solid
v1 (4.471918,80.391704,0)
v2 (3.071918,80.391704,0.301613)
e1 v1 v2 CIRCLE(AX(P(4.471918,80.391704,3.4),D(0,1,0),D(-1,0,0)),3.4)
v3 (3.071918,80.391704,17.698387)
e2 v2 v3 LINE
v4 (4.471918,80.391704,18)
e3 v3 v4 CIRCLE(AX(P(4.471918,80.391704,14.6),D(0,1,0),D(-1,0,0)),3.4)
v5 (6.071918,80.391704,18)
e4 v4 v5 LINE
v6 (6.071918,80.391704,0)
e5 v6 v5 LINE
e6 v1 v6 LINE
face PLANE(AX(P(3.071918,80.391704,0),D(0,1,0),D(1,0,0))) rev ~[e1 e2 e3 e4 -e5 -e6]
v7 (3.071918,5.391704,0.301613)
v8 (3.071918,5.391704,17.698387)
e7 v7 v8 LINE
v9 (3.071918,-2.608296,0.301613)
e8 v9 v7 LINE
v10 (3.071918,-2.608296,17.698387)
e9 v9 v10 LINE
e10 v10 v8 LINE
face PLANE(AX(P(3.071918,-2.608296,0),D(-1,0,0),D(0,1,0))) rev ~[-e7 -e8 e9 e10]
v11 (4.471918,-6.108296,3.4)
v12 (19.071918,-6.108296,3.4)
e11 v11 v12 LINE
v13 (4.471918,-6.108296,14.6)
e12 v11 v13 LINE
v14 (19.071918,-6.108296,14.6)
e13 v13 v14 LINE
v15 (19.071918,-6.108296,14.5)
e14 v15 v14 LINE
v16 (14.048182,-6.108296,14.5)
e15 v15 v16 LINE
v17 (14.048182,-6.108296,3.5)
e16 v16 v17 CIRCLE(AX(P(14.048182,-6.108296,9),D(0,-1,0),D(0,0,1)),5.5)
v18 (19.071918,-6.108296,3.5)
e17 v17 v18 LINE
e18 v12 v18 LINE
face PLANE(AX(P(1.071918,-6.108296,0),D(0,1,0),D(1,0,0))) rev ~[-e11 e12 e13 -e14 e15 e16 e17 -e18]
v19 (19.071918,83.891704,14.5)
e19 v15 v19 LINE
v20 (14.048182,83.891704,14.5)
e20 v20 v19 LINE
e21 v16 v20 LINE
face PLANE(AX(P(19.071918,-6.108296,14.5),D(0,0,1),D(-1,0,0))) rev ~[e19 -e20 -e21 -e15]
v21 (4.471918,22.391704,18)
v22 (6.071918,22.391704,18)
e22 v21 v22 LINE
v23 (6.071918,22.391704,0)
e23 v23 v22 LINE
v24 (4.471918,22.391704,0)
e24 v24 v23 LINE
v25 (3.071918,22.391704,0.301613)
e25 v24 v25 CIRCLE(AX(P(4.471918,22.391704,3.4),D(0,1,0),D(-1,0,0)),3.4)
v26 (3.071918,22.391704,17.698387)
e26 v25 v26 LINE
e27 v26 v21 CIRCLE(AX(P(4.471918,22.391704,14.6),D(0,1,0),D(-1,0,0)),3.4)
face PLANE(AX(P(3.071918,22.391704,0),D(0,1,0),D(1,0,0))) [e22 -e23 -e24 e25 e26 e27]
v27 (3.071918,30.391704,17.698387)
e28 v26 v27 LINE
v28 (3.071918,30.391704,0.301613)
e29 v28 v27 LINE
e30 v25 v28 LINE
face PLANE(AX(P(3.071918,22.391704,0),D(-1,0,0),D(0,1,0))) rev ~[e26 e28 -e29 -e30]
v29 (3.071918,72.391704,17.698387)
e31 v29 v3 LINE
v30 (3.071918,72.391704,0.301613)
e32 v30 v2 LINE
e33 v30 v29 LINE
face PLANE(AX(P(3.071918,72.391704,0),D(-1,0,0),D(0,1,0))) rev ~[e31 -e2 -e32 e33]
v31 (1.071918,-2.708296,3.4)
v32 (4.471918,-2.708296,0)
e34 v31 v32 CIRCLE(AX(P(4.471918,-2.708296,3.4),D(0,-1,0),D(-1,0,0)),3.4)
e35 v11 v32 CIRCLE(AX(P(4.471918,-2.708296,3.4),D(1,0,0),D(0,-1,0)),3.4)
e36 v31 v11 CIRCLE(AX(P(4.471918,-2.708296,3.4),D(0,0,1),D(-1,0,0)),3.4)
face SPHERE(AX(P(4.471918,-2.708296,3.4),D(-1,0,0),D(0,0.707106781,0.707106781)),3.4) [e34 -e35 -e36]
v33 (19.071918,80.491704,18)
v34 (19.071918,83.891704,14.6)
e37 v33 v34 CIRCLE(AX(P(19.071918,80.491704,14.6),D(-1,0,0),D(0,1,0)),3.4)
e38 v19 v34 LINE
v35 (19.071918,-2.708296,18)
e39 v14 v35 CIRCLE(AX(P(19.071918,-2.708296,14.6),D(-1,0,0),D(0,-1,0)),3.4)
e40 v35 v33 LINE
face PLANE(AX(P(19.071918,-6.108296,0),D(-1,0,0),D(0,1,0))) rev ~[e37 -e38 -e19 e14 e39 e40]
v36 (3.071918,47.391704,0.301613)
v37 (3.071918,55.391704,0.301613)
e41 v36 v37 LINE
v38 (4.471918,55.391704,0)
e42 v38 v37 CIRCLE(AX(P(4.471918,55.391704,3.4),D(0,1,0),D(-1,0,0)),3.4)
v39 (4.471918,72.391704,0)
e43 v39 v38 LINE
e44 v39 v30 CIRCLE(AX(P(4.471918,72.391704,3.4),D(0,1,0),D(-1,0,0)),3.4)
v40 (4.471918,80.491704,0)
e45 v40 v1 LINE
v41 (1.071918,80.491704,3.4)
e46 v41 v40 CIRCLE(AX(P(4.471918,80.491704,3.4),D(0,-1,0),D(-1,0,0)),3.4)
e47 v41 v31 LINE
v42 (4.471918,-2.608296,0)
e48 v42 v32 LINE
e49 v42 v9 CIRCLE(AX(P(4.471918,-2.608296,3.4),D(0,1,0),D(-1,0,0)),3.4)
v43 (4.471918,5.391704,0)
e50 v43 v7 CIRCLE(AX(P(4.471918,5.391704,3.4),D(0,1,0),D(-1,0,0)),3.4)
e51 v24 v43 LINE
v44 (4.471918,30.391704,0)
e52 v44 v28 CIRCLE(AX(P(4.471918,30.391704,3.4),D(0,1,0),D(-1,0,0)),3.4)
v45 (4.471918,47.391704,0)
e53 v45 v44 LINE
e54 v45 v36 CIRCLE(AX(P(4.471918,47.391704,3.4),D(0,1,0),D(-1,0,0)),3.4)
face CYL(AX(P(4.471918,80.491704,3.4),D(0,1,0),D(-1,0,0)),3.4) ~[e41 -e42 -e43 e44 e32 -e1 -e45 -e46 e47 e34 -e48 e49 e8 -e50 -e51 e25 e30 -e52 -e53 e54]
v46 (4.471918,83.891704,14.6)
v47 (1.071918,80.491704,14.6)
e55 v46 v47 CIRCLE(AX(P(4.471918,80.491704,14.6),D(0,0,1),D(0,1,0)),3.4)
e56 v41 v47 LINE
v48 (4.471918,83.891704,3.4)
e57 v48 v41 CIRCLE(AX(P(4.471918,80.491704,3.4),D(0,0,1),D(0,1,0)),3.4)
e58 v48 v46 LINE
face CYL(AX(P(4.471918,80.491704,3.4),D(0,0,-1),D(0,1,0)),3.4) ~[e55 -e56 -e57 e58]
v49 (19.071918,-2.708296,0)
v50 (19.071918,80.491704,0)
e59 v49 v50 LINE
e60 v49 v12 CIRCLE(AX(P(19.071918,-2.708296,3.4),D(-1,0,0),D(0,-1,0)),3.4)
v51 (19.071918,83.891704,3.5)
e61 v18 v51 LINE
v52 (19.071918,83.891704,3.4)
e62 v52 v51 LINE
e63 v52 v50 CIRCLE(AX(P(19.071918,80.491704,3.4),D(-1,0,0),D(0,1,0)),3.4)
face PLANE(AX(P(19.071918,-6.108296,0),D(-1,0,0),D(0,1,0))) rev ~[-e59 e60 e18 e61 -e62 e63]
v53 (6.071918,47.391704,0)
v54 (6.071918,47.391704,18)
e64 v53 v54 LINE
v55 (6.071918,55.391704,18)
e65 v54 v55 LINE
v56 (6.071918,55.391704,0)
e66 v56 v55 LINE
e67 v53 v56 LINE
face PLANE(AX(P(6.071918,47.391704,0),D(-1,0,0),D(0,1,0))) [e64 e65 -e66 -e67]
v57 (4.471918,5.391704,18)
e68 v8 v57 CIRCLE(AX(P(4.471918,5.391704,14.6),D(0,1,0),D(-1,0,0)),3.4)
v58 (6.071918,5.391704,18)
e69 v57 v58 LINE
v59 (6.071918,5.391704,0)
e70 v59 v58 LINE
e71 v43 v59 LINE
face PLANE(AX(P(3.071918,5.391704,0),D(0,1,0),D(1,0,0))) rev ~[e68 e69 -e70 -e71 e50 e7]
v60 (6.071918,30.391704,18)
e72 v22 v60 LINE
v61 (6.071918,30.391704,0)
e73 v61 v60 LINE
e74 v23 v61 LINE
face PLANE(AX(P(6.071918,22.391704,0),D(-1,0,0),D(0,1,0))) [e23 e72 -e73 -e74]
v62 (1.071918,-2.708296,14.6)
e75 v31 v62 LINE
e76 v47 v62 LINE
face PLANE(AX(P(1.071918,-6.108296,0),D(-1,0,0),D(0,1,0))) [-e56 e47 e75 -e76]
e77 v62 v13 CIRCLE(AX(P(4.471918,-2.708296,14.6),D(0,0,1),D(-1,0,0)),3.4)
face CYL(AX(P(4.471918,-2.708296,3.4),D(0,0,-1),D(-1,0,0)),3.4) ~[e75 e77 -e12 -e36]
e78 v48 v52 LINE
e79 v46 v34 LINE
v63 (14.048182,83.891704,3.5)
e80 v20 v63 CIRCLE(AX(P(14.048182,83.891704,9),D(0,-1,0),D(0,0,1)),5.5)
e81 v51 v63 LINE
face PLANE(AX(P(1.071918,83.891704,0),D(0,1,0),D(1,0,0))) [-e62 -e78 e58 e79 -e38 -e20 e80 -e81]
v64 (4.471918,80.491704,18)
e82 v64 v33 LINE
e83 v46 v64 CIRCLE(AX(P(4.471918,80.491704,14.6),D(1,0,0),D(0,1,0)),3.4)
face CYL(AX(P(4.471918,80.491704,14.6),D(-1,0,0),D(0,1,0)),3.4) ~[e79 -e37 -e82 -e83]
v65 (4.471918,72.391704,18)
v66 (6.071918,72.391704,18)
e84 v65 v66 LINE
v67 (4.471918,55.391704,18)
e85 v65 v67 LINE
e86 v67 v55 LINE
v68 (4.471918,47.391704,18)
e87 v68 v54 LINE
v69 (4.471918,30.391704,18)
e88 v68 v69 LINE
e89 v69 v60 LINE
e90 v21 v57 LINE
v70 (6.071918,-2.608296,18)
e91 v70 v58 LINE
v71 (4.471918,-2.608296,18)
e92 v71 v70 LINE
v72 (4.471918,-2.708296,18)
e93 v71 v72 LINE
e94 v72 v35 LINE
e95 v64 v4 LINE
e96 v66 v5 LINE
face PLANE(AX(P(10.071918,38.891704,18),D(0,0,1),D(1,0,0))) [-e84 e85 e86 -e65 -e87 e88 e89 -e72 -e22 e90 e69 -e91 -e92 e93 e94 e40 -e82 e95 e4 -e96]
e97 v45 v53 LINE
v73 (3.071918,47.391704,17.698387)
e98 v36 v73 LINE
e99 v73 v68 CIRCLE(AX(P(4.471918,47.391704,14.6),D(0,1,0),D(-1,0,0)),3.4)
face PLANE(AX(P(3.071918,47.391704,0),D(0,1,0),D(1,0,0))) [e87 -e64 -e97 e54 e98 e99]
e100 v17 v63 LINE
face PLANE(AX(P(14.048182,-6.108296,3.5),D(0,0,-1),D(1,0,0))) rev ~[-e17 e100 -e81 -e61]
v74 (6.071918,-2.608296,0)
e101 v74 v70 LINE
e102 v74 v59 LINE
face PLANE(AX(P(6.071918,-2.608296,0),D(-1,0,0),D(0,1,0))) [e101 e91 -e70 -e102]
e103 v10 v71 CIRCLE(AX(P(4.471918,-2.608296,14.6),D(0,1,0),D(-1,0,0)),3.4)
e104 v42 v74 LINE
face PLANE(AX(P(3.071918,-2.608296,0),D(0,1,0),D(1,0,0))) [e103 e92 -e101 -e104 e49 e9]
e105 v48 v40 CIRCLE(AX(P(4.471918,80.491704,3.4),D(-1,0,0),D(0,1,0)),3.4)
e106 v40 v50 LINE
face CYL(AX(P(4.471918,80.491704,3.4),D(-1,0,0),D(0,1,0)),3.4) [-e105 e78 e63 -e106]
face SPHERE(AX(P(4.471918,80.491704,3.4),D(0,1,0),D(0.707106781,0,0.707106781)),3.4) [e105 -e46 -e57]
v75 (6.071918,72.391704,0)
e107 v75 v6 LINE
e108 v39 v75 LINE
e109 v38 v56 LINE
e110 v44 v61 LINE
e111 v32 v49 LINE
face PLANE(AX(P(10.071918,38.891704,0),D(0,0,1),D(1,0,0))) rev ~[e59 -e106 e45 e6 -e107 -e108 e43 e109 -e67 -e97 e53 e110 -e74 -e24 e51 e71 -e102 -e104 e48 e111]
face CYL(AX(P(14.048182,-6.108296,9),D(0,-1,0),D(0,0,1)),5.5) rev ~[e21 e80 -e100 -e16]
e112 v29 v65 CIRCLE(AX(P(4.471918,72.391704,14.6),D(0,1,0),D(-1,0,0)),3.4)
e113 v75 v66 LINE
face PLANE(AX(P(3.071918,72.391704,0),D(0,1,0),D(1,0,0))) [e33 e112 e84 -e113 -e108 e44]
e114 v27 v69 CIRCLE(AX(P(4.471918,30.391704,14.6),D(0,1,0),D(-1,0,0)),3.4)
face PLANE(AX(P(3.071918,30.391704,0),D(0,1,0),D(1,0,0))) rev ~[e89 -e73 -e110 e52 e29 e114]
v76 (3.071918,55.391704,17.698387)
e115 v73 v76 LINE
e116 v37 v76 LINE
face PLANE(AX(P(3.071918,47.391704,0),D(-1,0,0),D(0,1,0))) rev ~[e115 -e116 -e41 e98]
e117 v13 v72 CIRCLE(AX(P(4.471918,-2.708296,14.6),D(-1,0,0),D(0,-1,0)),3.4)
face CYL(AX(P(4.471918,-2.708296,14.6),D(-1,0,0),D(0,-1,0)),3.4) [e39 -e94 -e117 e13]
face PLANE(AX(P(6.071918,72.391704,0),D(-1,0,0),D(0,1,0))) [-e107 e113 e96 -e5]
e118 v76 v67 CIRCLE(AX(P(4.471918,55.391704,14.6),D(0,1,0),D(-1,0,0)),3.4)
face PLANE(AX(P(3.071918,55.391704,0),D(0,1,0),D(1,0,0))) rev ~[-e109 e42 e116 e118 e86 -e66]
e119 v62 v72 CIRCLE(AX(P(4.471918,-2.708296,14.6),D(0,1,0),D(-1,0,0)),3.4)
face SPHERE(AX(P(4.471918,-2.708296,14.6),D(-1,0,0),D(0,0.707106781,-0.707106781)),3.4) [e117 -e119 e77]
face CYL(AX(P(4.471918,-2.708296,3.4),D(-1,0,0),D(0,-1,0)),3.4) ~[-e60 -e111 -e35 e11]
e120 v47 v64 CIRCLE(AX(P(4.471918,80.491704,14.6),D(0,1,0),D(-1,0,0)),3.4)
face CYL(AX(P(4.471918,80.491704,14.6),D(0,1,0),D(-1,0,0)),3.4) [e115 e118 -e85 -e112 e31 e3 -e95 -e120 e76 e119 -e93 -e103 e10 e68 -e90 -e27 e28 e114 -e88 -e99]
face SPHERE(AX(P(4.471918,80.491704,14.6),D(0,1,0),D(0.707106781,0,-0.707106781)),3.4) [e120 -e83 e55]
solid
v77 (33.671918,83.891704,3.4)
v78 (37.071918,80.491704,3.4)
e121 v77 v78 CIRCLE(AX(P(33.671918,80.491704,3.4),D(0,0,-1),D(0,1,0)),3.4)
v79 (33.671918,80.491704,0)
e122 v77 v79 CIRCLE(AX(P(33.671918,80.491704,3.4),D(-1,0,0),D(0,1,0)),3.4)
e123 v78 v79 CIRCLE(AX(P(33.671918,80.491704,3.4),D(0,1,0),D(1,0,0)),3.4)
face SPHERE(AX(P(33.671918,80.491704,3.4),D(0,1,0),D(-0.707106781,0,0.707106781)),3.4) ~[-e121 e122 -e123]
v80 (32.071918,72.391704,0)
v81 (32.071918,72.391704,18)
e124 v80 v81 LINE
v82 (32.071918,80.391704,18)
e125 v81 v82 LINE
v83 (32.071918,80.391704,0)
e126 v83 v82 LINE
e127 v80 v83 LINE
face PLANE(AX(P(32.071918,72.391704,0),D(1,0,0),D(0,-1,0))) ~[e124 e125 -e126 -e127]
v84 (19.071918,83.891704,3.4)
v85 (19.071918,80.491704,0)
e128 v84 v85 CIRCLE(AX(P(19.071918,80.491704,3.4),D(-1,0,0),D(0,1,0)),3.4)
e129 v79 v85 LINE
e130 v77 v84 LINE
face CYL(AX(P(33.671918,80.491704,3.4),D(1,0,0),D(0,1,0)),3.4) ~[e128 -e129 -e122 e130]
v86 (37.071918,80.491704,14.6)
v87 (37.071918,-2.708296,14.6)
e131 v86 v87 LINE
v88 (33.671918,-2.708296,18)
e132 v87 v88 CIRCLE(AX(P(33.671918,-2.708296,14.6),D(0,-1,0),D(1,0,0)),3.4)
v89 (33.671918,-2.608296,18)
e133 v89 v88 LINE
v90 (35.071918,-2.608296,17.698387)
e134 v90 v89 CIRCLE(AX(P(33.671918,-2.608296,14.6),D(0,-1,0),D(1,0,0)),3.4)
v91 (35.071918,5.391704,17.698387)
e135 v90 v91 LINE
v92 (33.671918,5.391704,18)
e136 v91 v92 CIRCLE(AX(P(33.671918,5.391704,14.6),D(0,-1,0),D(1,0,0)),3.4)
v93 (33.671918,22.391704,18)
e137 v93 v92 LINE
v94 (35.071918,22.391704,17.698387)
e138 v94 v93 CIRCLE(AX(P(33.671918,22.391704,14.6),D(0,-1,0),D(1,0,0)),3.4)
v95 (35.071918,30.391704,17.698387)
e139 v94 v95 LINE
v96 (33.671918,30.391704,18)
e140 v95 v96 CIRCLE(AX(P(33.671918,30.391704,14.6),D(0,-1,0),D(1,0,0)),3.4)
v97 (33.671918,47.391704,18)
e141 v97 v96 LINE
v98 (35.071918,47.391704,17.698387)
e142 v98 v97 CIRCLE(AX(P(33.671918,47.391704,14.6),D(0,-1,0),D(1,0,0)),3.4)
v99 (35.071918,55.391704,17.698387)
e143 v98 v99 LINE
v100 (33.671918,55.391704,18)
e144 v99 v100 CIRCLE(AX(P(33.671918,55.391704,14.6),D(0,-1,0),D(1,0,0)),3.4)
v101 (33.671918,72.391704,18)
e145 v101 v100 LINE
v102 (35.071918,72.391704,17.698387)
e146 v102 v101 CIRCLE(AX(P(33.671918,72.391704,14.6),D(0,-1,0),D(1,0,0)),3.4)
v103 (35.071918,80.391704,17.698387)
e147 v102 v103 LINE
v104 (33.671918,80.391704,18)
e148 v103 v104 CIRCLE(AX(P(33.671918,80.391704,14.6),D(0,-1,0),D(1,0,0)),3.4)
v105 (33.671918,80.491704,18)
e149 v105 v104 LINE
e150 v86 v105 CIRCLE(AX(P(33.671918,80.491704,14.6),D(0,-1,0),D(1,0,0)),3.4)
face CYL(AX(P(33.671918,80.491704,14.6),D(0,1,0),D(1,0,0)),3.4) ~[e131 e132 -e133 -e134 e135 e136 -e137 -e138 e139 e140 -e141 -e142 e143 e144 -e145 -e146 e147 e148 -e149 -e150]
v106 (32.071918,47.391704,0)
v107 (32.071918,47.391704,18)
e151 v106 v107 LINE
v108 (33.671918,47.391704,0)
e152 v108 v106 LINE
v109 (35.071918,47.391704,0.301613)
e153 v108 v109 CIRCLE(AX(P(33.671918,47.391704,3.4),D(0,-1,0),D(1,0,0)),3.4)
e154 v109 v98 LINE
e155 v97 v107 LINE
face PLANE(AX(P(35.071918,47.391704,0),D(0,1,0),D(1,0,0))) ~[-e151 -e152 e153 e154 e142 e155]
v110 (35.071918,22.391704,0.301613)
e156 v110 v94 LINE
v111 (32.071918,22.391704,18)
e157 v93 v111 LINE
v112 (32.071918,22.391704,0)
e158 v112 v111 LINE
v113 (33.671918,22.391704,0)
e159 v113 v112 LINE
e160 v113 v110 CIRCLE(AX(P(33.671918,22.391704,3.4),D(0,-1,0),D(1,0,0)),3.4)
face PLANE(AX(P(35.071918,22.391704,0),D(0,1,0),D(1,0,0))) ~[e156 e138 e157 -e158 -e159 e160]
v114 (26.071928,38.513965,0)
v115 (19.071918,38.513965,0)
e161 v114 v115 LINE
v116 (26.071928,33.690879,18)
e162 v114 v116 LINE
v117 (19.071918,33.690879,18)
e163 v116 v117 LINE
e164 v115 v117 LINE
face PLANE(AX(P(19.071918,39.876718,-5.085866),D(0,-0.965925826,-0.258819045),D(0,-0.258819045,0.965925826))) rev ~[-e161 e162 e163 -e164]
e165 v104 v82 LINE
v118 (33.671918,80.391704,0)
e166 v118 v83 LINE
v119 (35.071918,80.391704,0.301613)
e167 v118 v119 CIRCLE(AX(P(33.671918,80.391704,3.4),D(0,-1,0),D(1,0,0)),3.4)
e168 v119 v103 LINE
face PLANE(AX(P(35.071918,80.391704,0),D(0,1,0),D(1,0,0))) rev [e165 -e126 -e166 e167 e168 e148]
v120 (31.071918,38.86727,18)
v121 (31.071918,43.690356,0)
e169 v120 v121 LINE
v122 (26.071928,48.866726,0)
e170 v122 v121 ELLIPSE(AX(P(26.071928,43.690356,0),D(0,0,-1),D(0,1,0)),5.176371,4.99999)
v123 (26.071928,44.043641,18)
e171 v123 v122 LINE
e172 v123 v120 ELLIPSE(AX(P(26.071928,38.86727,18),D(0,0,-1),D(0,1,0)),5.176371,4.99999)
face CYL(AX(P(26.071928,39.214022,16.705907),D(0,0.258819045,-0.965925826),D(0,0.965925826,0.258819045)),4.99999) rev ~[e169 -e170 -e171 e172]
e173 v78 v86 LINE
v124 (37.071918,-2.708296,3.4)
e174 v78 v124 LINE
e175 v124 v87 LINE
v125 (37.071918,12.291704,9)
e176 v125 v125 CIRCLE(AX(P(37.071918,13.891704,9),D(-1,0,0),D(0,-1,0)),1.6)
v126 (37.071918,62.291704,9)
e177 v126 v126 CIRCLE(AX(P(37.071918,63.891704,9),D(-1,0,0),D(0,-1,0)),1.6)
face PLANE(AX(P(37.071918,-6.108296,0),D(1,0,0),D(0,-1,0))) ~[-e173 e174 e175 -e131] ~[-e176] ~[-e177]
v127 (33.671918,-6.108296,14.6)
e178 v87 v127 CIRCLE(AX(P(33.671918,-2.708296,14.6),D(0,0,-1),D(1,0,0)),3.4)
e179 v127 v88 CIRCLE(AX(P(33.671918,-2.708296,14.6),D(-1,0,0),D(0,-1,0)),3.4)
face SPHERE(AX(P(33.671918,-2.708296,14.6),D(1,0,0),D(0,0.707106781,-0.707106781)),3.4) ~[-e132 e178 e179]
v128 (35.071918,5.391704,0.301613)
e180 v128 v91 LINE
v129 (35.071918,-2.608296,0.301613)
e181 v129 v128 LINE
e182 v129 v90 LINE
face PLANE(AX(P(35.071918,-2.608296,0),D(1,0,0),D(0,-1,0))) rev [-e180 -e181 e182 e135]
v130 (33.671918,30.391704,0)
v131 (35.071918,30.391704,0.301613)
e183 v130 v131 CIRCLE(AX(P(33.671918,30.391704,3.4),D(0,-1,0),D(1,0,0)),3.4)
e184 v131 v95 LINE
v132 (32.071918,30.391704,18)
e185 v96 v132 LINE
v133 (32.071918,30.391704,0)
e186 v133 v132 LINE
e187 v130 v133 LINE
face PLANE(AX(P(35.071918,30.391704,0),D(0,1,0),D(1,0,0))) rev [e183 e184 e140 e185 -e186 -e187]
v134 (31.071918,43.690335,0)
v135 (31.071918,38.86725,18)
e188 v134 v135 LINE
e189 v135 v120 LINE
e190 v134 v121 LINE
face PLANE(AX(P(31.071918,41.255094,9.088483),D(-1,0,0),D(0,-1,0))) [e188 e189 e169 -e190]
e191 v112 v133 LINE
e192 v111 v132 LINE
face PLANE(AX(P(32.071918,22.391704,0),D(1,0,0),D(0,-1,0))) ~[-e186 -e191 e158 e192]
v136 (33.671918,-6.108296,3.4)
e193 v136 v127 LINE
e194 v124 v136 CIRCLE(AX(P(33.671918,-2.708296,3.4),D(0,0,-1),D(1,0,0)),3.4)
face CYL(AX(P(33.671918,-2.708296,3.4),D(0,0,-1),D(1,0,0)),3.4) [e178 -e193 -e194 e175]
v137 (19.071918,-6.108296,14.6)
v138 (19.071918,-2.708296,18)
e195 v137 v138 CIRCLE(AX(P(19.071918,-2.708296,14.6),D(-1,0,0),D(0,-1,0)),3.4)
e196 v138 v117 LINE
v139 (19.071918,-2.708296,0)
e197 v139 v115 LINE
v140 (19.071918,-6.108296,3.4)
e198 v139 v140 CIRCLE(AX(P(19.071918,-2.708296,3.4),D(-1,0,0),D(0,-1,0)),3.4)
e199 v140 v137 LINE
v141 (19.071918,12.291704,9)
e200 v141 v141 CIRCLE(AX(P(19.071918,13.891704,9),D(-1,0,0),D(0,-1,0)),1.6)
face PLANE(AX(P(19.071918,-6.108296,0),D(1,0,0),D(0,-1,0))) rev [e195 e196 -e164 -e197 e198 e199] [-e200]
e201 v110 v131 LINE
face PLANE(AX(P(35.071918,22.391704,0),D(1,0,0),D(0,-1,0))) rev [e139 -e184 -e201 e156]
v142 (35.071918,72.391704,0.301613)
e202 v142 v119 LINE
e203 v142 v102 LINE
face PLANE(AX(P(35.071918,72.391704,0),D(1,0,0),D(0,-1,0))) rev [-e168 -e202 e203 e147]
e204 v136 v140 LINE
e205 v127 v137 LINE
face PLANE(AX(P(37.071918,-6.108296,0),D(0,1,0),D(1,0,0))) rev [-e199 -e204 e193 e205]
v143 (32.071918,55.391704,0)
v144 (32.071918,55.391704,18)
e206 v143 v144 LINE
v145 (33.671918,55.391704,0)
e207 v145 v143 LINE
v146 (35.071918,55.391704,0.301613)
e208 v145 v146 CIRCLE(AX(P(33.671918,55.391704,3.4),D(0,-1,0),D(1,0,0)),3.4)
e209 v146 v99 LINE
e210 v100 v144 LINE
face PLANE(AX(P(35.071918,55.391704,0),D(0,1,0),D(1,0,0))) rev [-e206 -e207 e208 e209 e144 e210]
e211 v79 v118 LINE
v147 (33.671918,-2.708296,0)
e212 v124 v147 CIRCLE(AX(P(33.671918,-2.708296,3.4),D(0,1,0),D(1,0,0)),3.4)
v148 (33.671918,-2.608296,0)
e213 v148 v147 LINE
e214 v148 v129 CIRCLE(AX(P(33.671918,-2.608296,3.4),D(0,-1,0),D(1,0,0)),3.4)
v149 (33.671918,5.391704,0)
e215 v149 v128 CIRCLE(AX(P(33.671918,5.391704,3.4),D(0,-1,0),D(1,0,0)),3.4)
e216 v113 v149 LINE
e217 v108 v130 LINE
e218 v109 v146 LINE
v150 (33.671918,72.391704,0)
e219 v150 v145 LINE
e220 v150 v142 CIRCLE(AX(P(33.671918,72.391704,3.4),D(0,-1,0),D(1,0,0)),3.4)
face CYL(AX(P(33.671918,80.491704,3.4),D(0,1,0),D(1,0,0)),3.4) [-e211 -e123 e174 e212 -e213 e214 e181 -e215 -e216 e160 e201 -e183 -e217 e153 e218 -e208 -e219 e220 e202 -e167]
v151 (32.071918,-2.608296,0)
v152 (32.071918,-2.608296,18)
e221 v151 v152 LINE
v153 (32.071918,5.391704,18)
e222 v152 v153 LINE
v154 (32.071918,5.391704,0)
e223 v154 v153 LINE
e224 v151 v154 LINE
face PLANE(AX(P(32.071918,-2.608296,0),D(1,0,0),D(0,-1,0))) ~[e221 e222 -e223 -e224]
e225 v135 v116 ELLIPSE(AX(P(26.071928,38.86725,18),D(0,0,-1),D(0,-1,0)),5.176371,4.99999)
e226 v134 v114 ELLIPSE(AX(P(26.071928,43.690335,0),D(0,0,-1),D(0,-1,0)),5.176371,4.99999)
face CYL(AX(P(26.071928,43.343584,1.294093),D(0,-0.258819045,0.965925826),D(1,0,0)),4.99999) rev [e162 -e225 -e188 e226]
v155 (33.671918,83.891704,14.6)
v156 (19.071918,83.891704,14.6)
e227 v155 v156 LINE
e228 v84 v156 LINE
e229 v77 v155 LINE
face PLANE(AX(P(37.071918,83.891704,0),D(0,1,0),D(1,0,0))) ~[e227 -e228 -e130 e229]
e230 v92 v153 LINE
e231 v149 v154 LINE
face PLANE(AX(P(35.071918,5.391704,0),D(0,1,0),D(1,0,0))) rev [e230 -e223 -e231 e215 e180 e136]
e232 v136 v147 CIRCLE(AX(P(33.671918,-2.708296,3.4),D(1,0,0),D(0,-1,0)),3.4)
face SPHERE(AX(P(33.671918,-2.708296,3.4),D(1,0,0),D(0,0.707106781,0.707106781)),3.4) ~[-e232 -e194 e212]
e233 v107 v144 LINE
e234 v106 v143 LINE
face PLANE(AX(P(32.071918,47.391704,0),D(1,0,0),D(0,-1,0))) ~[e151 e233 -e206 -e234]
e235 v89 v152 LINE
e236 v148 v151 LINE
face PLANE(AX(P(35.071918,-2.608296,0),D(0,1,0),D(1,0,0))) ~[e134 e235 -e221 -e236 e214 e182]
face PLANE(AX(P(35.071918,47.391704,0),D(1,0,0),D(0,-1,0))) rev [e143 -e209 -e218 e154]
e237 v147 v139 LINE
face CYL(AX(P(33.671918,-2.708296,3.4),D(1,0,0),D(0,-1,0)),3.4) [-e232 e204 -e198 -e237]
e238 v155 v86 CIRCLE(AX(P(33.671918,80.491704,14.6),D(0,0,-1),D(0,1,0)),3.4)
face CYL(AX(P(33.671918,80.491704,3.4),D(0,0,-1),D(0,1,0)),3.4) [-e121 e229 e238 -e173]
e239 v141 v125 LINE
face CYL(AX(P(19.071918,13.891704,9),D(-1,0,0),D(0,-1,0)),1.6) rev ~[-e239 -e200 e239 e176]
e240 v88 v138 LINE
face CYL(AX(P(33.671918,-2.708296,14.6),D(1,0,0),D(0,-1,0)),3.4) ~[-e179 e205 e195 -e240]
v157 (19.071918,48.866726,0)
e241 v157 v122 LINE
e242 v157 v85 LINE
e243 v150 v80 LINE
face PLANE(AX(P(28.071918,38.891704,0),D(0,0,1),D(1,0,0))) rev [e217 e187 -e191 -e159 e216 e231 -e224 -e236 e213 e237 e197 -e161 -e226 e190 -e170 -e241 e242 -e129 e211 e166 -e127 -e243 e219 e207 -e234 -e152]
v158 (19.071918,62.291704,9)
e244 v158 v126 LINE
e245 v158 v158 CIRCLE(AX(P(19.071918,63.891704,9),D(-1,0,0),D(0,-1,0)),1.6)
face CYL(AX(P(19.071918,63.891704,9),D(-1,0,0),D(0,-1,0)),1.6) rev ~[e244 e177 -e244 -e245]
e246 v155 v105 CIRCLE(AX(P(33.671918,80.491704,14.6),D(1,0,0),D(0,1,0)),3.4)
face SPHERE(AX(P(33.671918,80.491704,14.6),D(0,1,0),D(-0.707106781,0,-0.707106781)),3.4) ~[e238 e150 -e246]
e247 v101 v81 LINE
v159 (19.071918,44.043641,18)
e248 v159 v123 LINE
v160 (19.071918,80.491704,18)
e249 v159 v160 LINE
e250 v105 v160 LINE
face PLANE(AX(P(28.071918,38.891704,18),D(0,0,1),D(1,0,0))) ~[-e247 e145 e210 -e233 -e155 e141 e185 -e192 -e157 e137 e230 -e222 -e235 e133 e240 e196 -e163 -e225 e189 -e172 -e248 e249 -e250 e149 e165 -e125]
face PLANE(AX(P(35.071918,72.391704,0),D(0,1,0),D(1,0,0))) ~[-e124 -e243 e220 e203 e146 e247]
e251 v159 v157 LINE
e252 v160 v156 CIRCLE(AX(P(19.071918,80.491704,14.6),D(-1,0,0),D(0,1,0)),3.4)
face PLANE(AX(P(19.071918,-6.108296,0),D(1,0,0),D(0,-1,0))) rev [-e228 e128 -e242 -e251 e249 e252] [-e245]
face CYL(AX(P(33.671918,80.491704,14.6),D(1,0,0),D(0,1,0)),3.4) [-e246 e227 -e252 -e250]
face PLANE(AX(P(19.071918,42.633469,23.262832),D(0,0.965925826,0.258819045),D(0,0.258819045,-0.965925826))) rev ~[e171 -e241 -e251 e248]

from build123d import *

# Parameters (mm, degrees)
F0_W         = 18
F0_H         = 90
F0_W_2       = 3
F0_H_2       = 8
F1_DEPTH     = 18
F3_T1_DEPTH  = 23.1
F3_T3_DEPTH  = 83.2
F3_T5_DEPTH  = 11.2
F3_S9_W      = 3.4
F3_S9_H      = 3.4
F3_T10_DEPTH = 3.4
F3_S15_W     = 3.4
F3_S15_H     = 3.4
F3_T16_DEPTH = 3.4
F3_S21_W     = 3.4
F3_S21_H     = 3.4
F3_T22_DEPTH = 3.4
F3_S27_W     = 3.4
F3_S27_H     = 3.4
F3_T28_DEPTH = 3.4
F5_DEPTH     = 90.001
F7_DEPTH     = 12
F8_R         = 4.99999
F9_R         = 1.6
F10_DEPTH    = 18.001


# Not quite as in the source:
# - a fillet or chamfer that OpenCascade refuses, or shapes differently, is made with other operations: its cross-section is extruded or revolved along the edge and cut away or added
# - a fillet or chamfer is up to 0.001 mm smaller than in the source, because OpenCascade refuses the exact size


with BuildPart() as f1:
    # F0 (on Top) → F1 (new body)
    with BuildSketch(Plane.XY):
        with Locations((10.0719179884, 38.8917037249)):
            Rectangle(F0_W, F0_H)
        with Locations((4.5719179884, 1.3917037249)):
            Rectangle(F0_W_2, F0_H_2, mode=Mode.SUBTRACT)
        with Locations((4.5719179884, 26.3917037249)):
            Rectangle(F0_W_2, F0_H_2, mode=Mode.SUBTRACT)
        with Locations((4.5719179884, 51.3917037249)):
            Rectangle(F0_W_2, F0_H_2, mode=Mode.SUBTRACT)
        with Locations((4.5719179884, 76.3917037249)):
            Rectangle(F0_W_2, F0_H_2, mode=Mode.SUBTRACT)
    extrude(amount=F1_DEPTH)

    # F3: fillet of radius 3.4 on 8 edges, made by hand

    # F3_s2 → F3_t1 (cut)
    with BuildSketch(Plane.YZ.offset(4.4719179884)):
        with BuildLine():
            ThreePointArc((-6.1082962751, 14.6), (-5.1124593312, 17.004163056), (-2.7082962751, 18))
            Line((-2.7082962751, 18), (-6.1082962751, 18))
            Line((-6.1082962751, 18), (-6.1082962751, 14.6))
        make_face()
        with BuildLine():
            ThreePointArc((-6.1082962751, 3.4), (-5.1124593312, 0.995836944), (-2.7082962751, 0))
            Line((-2.7082962751, 0), (-6.1082962751, 0))
            Line((-6.1082962751, 0), (-6.1082962751, 3.4))
        make_face()
        with BuildLine():
            ThreePointArc((83.8917037249, 14.6), (82.8958667809, 17.004163056), (80.4917037249, 18))
            Line((80.4917037249, 18), (83.8917037249, 18))
            Line((83.8917037249, 18), (83.8917037249, 14.6))
        make_face()
        with BuildLine():
            ThreePointArc((83.8917037249, 3.4), (82.8958667809, 0.995836944), (80.4917037249, 0))
            Line((80.4917037249, 0), (83.8917037249, 0))
            Line((83.8917037249, 0), (83.8917037249, 3.4))
        make_face()
    extrude(amount=F3_T1_DEPTH, mode=Mode.SUBTRACT)

    # F3_s4 → F3_t3 (cut)
    with BuildSketch(Plane.XZ.offset(-80.4917037249)):
        with BuildLine():
            ThreePointArc((1.0719179884, 14.6), (2.0677549323, 17.004163056), (4.4719179884, 18))
            Line((4.4719179884, 18), (1.0719179884, 18))
            Line((1.0719179884, 18), (1.0719179884, 14.6))
        make_face()
        with BuildLine():
            ThreePointArc((1.0719179884, 3.4), (2.0677549323, 0.995836944), (4.4719179884, 0))
            Line((4.4719179884, 0), (1.0719179884, 0))
            Line((1.0719179884, 0), (1.0719179884, 3.4))
        make_face()
    extrude(amount=F3_T3_DEPTH, mode=Mode.SUBTRACT)

    # F3_s6 → F3_t5 (cut)
    with BuildSketch(Plane.XY.offset(3.4)):
        with BuildLine():
            ThreePointArc((1.0719179884, -2.7082962751), (2.0677549323, -5.1124593312), (4.4719179884, -6.1082962751))
            Line((4.4719179884, -6.1082962751), (1.0719179884, -6.1082962751))
            Line((1.0719179884, -6.1082962751), (1.0719179884, -2.7082962751))
        make_face()
        with BuildLine():
            ThreePointArc((4.4719179884, 83.8917037249), (2.0677549323, 82.8958667809), (1.0719179884, 80.4917037249))
            Line((1.0719179884, 80.4917037249), (1.0719179884, 83.8917037249))
            Line((1.0719179884, 83.8917037249), (4.4719179884, 83.8917037249))
        make_face()
    extrude(amount=F3_T5_DEPTH, mode=Mode.SUBTRACT)


with BuildPart() as f3_tool8:
    # F3_s9 → F3_t10 (new body)
    with BuildSketch(Plane.YZ.offset(4.4719179884)):
        with Locations((-4.4082962751, 16.3)):
            Rectangle(F3_S9_W, F3_S9_H)
    extrude(amount=-F3_T10_DEPTH)

    # F3_s11 → F3_t12 (revolve, cut)
    with BuildSketch(Plane(origin=(4.4719179884, -2.7082962751, 14.6), x_dir=(0, 0.7071067812, -0.7071067812), z_dir=(0, 0.7071067812, 0.7071067812))):
        with BuildLine():
            ThreePointArc((0, -3.4), (3.4, 0), (0, 3.4))
            Line((0, 3.4), (0, -3.4))
        make_face()
    revolve(axis=Axis((4.4719179884, -2.7082962751, 14.6), (-1, 0, 0)), mode=Mode.SUBTRACT)


with BuildPart() as f1_1:
    add(f1.part)

    # F3_t7: cut F3_tool8
    add(f3_tool8.part, mode=Mode.SUBTRACT)


with BuildPart() as f3_tool14:
    # F3_s15 → F3_t16 (new body)
    with BuildSketch(Plane.XZ.offset(-80.4917037249)):
        with Locations((2.7719179884, 16.3)):
            Rectangle(F3_S15_W, F3_S15_H)
    extrude(amount=-F3_T16_DEPTH)

    # F3_s17 → F3_t18 (revolve, cut)
    with BuildSketch(Plane(origin=(4.4719179884, 80.4917037249, 14.6), x_dir=(0.7071067812, 0, -0.7071067812), z_dir=(0.7071067812, 0, 0.7071067812))):
        with BuildLine():
            ThreePointArc((0, -3.4), (3.4, 0), (0, 3.4))
            Line((0, 3.4), (0, -3.4))
        make_face()
    revolve(axis=Axis((4.4719179884, 80.4917037249, 14.6), (0, 1, 0)), mode=Mode.SUBTRACT)


with BuildPart() as f1_2:
    add(f1_1.part)

    # F3_t13: cut F3_tool14
    add(f3_tool14.part, mode=Mode.SUBTRACT)


with BuildPart() as f3_tool20:
    # F3_s21 → F3_t22 (new body)
    with BuildSketch(Plane.YZ.offset(4.4719179884)):
        with Locations((-4.4082962751, 1.7)):
            Rectangle(F3_S21_W, F3_S21_H)
    extrude(amount=-F3_T22_DEPTH)

    # F3_s23 → F3_t24 (revolve, cut)
    with BuildSketch(Plane(origin=(4.4719179884, -2.7082962751, 3.4), x_dir=(0, 0.7071067812, 0.7071067812), z_dir=(0, -0.7071067812, 0.7071067812))):
        with BuildLine():
            ThreePointArc((0, -3.4), (3.4, 0), (0, 3.4))
            Line((0, 3.4), (0, -3.4))
        make_face()
    revolve(axis=Axis((4.4719179884, -2.7082962751, 3.4), (-1, 0, 0)), mode=Mode.SUBTRACT)


with BuildPart() as f1_3:
    add(f1_2.part)

    # F3_t19: cut F3_tool20
    add(f3_tool20.part, mode=Mode.SUBTRACT)


with BuildPart() as f3_tool26:
    # F3_s27 → F3_t28 (new body)
    with BuildSketch(Plane.XZ.offset(-80.4917037249)):
        with Locations((2.7719179884, 1.7)):
            Rectangle(F3_S27_W, F3_S27_H)
    extrude(amount=-F3_T28_DEPTH)

    # F3_s29 → F3_t30 (revolve, cut)
    with BuildSketch(Plane(origin=(4.4719179884, 80.4917037249, 3.4), x_dir=(0.7071067812, 0, 0.7071067812), z_dir=(-0.7071067812, 0, 0.7071067812))):
        with BuildLine():
            ThreePointArc((0, -3.4), (3.4, 0), (0, 3.4))
            Line((0, 3.4), (0, -3.4))
        make_face()
    revolve(axis=Axis((4.4719179884, 80.4917037249, 3.4), (0, 1, 0)), mode=Mode.SUBTRACT)


with BuildPart() as f1_4:
    add(f1_3.part)

    # F3_t25: cut F3_tool26
    add(f3_tool26.part, mode=Mode.SUBTRACT)


with BuildPart() as f4_1:
    # F4: instance of F1
    add(f1_4.part.mirror(Plane(origin=(19.0719179884, 38.8917037249, 9), x_dir=(0, 1, 0), z_dir=(1, 0, 0))))

    # F6 (on face) → F7 (cut)
    with BuildSketch(Plane(origin=(19.0719179884, 0, 0), x_dir=(0, -1, 0), z_dir=(-1, 0, 0))):
        Polygon((-39.876718396, -5.0858661007), (-32.9742111659, 20.6746415815), (-42.6334694288, 23.2628320326), (-49.5359766589, -2.4976756497), align=None)
    extrude(amount=-F7_DEPTH, mode=Mode.SUBTRACT)

    # F8 (radius 5 in the source; OpenCascade refuses exactly that, so slightly less here)
    f8_edges = [f4_1.edges().sort_by_distance(p)[0] for p in [
        (31.071918, 46.455184, 9),
        (31.071918, 36.102422, 9),
    ]]
    fillet(f8_edges, radius=F8_R)

    # F9 (on face) → F10 (cut, through all)
    with BuildSketch(Plane(origin=(19.0719179884, 0, 0), x_dir=(0, -1, 0), z_dir=(-1, 0, 0))):
        with Locations((-63.8917037249, 9)):
            Circle(F9_R)
        with Locations((-13.8917037249, 9)):
            Circle(F9_R)
    extrude(amount=-F10_DEPTH, mode=Mode.SUBTRACT)


with BuildPart() as f1_5:
    add(f1_4.part)

    # F2 (on face) → F5 (cut, through all)
    with BuildSketch(Plane.XZ.offset(6.1082962751)):
        with BuildLine():
            Line((19.0719179884, 6.7612328898), (19.0719179884, 11.2387671102))
            ThreePointArc((19.0719179884, 11.2387671102), (17.042909252, 13.613199492), (14.0481821448, 14.5))
            Line((14.0481821448, 14.5), (14.0481821448, 3.5))
            ThreePointArc((14.0481821448, 3.5), (17.042909252, 4.386800508), (19.0719179884, 6.7612328898))
        make_face()
        with BuildLine():
            ThreePointArc((14.0481821448, 14.5), (17.042909252, 13.613199492), (19.0719179884, 11.2387671102))
            Line((19.0719179884, 11.2387671102), (19.0719179884, 14.5))
            Line((19.0719179884, 14.5), (14.0481821448, 14.5))
        make_face()
        with BuildLine():
            Line((14.0481821448, 3.5), (14.0481821448, 14.5))
            ThreePointArc((14.0481821448, 14.5), (8.5481821448, 9), (14.0481821448, 3.5))
        make_face()
        with BuildLine():
            Line((19.0719179884, 3.5), (19.0719179884, 6.7612328898))
            ThreePointArc((19.0719179884, 6.7612328898), (17.042909252, 4.386800508), (14.0481821448, 3.5))
            Line((14.0481821448, 3.5), (19.0719179884, 3.5))
        make_face()
    extrude(amount=-F5_DEPTH, mode=Mode.SUBTRACT)


solid = Compound([f4_1.part, f1_5.part])
